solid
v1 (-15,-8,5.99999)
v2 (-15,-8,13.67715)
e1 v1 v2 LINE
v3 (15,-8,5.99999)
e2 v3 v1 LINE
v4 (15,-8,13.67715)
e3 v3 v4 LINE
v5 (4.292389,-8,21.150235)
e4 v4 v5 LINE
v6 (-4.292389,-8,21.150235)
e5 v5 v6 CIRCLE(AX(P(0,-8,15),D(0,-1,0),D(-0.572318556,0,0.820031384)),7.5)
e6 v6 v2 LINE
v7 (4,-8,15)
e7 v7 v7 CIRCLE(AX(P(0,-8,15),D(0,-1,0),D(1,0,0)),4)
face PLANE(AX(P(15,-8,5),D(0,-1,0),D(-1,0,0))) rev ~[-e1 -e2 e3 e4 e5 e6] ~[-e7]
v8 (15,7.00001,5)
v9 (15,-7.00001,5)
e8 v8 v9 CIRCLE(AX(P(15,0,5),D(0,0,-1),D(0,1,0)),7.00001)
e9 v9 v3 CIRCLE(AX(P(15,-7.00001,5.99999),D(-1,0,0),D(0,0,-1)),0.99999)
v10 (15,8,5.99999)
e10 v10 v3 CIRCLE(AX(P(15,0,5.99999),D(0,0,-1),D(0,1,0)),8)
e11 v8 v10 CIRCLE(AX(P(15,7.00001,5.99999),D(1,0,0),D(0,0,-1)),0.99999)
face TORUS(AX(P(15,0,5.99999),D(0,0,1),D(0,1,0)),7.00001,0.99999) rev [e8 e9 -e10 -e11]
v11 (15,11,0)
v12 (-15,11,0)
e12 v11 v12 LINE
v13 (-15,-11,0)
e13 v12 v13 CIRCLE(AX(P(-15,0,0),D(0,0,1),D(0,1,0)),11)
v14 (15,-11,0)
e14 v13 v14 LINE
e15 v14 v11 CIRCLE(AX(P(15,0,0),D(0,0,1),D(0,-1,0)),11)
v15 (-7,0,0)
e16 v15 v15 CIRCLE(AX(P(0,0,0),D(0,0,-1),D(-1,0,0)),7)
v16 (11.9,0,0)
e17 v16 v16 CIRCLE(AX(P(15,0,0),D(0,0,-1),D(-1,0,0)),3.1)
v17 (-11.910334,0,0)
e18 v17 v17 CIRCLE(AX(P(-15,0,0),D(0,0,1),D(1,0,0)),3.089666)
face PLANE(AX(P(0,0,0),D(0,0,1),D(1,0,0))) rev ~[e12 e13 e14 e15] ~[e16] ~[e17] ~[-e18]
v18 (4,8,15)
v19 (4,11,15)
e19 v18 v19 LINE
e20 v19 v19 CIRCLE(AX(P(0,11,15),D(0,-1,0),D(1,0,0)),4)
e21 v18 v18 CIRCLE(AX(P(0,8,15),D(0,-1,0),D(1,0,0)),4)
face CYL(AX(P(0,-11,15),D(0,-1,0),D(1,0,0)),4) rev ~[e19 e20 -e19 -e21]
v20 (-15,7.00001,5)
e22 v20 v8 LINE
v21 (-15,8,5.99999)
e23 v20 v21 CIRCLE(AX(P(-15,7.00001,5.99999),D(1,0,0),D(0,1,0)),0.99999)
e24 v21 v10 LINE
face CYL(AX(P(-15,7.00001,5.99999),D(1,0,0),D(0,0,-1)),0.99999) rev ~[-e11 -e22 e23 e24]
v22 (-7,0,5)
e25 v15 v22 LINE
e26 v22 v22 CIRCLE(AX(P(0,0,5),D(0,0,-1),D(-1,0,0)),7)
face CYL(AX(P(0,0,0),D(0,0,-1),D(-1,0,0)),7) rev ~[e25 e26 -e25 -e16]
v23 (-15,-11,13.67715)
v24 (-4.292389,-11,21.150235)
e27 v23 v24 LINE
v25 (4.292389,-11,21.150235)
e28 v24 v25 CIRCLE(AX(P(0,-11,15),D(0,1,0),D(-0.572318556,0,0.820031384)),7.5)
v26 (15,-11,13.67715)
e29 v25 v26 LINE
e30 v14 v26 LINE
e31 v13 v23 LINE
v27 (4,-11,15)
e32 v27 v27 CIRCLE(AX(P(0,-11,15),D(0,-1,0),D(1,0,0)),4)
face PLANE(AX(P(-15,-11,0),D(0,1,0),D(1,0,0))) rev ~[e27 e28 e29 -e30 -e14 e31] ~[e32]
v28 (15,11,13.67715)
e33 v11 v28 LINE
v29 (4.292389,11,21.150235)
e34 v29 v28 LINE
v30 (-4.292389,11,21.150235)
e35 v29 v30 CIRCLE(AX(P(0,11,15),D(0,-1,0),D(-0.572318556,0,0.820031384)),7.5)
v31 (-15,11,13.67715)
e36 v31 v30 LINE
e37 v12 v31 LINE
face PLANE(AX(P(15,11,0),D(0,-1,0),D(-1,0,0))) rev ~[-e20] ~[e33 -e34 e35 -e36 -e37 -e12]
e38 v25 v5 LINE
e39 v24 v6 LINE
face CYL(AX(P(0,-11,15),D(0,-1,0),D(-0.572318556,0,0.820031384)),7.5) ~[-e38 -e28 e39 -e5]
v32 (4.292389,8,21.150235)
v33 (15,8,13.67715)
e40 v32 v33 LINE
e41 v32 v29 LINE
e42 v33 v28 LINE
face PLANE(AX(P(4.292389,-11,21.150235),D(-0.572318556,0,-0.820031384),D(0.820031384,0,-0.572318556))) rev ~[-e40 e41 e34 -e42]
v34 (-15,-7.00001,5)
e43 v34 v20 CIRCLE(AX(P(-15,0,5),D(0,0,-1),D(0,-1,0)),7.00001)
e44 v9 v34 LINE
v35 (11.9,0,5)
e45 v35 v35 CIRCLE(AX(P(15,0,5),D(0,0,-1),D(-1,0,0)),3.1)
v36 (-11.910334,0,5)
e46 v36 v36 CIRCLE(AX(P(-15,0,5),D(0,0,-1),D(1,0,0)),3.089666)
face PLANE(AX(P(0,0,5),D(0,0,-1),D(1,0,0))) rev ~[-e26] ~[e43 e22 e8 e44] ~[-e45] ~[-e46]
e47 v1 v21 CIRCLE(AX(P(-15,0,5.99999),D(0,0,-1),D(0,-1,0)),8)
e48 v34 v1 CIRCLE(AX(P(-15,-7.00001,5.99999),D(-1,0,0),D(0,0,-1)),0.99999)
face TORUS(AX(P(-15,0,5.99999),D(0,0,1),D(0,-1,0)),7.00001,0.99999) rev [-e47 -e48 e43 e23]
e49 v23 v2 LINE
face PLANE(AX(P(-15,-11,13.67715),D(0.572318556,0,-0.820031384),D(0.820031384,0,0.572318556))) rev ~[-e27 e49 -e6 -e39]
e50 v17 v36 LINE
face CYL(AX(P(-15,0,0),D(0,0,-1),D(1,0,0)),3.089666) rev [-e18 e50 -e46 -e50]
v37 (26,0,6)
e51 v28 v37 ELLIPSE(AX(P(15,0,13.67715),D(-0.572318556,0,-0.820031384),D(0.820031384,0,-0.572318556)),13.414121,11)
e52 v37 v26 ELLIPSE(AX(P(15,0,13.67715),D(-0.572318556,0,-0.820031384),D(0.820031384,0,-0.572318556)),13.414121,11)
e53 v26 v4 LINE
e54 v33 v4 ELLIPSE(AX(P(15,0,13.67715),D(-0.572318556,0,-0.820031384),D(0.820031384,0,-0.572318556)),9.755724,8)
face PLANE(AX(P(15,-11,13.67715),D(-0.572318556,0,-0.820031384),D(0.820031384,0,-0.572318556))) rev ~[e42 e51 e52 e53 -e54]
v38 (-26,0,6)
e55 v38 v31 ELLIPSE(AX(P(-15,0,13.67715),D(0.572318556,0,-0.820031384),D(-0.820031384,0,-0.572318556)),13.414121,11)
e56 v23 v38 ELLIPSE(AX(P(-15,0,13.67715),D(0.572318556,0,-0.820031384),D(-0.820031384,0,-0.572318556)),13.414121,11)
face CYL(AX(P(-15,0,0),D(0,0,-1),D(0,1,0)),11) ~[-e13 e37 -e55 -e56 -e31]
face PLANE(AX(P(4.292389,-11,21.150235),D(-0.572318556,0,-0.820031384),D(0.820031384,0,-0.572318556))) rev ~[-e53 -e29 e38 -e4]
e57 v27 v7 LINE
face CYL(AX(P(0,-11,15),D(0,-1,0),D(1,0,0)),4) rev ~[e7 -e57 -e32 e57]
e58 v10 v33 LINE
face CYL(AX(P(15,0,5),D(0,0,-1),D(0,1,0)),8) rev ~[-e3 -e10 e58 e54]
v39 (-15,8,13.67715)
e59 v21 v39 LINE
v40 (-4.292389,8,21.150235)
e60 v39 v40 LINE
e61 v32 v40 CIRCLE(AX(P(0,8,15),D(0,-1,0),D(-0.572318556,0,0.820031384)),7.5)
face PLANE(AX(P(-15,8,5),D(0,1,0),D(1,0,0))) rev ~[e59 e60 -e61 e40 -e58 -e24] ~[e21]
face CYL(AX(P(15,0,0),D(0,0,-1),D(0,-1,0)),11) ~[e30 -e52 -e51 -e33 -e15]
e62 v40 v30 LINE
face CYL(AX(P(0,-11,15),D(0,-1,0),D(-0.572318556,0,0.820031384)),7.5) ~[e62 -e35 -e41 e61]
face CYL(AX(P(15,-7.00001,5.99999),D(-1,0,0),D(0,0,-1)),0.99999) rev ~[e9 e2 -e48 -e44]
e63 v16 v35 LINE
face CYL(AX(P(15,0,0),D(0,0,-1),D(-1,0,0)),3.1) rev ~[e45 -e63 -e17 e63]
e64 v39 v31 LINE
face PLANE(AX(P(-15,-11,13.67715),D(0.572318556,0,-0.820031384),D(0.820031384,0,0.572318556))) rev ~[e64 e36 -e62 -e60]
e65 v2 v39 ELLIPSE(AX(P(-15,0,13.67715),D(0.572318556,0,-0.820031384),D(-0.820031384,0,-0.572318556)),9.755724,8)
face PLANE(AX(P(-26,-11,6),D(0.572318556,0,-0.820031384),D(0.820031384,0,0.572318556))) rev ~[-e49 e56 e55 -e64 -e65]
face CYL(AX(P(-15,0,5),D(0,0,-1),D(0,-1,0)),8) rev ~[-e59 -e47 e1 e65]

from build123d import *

# Parameters (mm, degrees)
F0_R     = 3.0896655398
F1_DEPTH = 25
F2_R     = 4
F3_DEPTH = 25
F6_DEPTH = 25
F7_R     = 0.99999


# Not quite as in the source:
# - a fillet or chamfer is up to 0.001 mm smaller than in the source, because OpenCascade refuses the exact size


with BuildPart() as f1:
    # F0 (on Top) → F1 (new body)
    with BuildSketch(Plane.XY):
        with BuildLine():
            ThreePointArc((-15, 11), (-26, 0), (-15, -11))
            Line((-15, -11), (15, -11))
            ThreePointArc((15, -11), (26, 0), (15, 11))
            Line((15, 11), (-15, 11))
        make_face()
        with Locations((-15, 0)):
            Circle(F0_R, mode=Mode.SUBTRACT)
        with BuildLine():
            ThreePointArc((7, 0), (0, -7), (-7, 0))
            ThreePointArc((-7, 0), (0, 7), (7, 0))
        make_face(mode=Mode.SUBTRACT)
        with BuildLine():
            ThreePointArc((18.1, 0), (15, -3.1), (11.9, 0))
            ThreePointArc((11.9, 0), (15, 3.1), (18.1, 0))
        make_face(mode=Mode.SUBTRACT)
    extrude(amount=F1_DEPTH)

    # F2 (on face) → F3 (cut)
    with BuildSketch(Plane.XZ.offset(11)):
        with BuildLine():
            Line((15, 25), (-15, 25))
            Line((-15, 25), (-15, 13.6771502157))
            Line((-15, 13.6771502157), (-4.2923891696, 21.1502353789))
            ThreePointArc((-4.2923891696, 21.1502353789), (0, 22.5), (4.2923891696, 21.1502353789))
            Line((4.2923891696, 21.1502353789), (15, 13.6771502157))
            Line((15, 13.6771502157), (15, 25))
        make_face()
        with BuildLine():
            Line((26, 25), (-26, 25))
            Line((-26, 25), (-26, 6))
            Line((-26, 6), (-4.2923891696, 21.1502353789))
            ThreePointArc((-4.2923891696, 21.1502353789), (0, 22.5), (4.2923891696, 21.1502353789))
            Line((4.2923891696, 21.1502353789), (26, 6))
            Line((26, 6), (26, 25))
        make_face()
        with Locations((0, 15)):
            Circle(F2_R)
    extrude(amount=-F3_DEPTH, mode=Mode.SUBTRACT)

    # F5 (on offset) → F6 (cut)
    with BuildSketch(Plane(origin=(0, 0, 5), x_dir=(1, 0, 0), z_dir=(0, 0, -1))):
        with BuildLine():
            Line((-15, -8), (15, -8))
            ThreePointArc((15, -8), (23, 0), (15, 8))
            Line((15, 8), (-15, 8))
            ThreePointArc((-15, 8), (-23, 0), (-15, -8))
        make_face()
    extrude(amount=-F6_DEPTH, mode=Mode.SUBTRACT)

    # F7 (radius 1 in the source; OpenCascade refuses exactly that, so slightly less here)
    f7_edges = [f1.edges().sort_by_distance(p)[0] for p in [
        (0, -8, 5),
    ]]
    fillet(f7_edges, radius=F7_R)


solid = f1.part
